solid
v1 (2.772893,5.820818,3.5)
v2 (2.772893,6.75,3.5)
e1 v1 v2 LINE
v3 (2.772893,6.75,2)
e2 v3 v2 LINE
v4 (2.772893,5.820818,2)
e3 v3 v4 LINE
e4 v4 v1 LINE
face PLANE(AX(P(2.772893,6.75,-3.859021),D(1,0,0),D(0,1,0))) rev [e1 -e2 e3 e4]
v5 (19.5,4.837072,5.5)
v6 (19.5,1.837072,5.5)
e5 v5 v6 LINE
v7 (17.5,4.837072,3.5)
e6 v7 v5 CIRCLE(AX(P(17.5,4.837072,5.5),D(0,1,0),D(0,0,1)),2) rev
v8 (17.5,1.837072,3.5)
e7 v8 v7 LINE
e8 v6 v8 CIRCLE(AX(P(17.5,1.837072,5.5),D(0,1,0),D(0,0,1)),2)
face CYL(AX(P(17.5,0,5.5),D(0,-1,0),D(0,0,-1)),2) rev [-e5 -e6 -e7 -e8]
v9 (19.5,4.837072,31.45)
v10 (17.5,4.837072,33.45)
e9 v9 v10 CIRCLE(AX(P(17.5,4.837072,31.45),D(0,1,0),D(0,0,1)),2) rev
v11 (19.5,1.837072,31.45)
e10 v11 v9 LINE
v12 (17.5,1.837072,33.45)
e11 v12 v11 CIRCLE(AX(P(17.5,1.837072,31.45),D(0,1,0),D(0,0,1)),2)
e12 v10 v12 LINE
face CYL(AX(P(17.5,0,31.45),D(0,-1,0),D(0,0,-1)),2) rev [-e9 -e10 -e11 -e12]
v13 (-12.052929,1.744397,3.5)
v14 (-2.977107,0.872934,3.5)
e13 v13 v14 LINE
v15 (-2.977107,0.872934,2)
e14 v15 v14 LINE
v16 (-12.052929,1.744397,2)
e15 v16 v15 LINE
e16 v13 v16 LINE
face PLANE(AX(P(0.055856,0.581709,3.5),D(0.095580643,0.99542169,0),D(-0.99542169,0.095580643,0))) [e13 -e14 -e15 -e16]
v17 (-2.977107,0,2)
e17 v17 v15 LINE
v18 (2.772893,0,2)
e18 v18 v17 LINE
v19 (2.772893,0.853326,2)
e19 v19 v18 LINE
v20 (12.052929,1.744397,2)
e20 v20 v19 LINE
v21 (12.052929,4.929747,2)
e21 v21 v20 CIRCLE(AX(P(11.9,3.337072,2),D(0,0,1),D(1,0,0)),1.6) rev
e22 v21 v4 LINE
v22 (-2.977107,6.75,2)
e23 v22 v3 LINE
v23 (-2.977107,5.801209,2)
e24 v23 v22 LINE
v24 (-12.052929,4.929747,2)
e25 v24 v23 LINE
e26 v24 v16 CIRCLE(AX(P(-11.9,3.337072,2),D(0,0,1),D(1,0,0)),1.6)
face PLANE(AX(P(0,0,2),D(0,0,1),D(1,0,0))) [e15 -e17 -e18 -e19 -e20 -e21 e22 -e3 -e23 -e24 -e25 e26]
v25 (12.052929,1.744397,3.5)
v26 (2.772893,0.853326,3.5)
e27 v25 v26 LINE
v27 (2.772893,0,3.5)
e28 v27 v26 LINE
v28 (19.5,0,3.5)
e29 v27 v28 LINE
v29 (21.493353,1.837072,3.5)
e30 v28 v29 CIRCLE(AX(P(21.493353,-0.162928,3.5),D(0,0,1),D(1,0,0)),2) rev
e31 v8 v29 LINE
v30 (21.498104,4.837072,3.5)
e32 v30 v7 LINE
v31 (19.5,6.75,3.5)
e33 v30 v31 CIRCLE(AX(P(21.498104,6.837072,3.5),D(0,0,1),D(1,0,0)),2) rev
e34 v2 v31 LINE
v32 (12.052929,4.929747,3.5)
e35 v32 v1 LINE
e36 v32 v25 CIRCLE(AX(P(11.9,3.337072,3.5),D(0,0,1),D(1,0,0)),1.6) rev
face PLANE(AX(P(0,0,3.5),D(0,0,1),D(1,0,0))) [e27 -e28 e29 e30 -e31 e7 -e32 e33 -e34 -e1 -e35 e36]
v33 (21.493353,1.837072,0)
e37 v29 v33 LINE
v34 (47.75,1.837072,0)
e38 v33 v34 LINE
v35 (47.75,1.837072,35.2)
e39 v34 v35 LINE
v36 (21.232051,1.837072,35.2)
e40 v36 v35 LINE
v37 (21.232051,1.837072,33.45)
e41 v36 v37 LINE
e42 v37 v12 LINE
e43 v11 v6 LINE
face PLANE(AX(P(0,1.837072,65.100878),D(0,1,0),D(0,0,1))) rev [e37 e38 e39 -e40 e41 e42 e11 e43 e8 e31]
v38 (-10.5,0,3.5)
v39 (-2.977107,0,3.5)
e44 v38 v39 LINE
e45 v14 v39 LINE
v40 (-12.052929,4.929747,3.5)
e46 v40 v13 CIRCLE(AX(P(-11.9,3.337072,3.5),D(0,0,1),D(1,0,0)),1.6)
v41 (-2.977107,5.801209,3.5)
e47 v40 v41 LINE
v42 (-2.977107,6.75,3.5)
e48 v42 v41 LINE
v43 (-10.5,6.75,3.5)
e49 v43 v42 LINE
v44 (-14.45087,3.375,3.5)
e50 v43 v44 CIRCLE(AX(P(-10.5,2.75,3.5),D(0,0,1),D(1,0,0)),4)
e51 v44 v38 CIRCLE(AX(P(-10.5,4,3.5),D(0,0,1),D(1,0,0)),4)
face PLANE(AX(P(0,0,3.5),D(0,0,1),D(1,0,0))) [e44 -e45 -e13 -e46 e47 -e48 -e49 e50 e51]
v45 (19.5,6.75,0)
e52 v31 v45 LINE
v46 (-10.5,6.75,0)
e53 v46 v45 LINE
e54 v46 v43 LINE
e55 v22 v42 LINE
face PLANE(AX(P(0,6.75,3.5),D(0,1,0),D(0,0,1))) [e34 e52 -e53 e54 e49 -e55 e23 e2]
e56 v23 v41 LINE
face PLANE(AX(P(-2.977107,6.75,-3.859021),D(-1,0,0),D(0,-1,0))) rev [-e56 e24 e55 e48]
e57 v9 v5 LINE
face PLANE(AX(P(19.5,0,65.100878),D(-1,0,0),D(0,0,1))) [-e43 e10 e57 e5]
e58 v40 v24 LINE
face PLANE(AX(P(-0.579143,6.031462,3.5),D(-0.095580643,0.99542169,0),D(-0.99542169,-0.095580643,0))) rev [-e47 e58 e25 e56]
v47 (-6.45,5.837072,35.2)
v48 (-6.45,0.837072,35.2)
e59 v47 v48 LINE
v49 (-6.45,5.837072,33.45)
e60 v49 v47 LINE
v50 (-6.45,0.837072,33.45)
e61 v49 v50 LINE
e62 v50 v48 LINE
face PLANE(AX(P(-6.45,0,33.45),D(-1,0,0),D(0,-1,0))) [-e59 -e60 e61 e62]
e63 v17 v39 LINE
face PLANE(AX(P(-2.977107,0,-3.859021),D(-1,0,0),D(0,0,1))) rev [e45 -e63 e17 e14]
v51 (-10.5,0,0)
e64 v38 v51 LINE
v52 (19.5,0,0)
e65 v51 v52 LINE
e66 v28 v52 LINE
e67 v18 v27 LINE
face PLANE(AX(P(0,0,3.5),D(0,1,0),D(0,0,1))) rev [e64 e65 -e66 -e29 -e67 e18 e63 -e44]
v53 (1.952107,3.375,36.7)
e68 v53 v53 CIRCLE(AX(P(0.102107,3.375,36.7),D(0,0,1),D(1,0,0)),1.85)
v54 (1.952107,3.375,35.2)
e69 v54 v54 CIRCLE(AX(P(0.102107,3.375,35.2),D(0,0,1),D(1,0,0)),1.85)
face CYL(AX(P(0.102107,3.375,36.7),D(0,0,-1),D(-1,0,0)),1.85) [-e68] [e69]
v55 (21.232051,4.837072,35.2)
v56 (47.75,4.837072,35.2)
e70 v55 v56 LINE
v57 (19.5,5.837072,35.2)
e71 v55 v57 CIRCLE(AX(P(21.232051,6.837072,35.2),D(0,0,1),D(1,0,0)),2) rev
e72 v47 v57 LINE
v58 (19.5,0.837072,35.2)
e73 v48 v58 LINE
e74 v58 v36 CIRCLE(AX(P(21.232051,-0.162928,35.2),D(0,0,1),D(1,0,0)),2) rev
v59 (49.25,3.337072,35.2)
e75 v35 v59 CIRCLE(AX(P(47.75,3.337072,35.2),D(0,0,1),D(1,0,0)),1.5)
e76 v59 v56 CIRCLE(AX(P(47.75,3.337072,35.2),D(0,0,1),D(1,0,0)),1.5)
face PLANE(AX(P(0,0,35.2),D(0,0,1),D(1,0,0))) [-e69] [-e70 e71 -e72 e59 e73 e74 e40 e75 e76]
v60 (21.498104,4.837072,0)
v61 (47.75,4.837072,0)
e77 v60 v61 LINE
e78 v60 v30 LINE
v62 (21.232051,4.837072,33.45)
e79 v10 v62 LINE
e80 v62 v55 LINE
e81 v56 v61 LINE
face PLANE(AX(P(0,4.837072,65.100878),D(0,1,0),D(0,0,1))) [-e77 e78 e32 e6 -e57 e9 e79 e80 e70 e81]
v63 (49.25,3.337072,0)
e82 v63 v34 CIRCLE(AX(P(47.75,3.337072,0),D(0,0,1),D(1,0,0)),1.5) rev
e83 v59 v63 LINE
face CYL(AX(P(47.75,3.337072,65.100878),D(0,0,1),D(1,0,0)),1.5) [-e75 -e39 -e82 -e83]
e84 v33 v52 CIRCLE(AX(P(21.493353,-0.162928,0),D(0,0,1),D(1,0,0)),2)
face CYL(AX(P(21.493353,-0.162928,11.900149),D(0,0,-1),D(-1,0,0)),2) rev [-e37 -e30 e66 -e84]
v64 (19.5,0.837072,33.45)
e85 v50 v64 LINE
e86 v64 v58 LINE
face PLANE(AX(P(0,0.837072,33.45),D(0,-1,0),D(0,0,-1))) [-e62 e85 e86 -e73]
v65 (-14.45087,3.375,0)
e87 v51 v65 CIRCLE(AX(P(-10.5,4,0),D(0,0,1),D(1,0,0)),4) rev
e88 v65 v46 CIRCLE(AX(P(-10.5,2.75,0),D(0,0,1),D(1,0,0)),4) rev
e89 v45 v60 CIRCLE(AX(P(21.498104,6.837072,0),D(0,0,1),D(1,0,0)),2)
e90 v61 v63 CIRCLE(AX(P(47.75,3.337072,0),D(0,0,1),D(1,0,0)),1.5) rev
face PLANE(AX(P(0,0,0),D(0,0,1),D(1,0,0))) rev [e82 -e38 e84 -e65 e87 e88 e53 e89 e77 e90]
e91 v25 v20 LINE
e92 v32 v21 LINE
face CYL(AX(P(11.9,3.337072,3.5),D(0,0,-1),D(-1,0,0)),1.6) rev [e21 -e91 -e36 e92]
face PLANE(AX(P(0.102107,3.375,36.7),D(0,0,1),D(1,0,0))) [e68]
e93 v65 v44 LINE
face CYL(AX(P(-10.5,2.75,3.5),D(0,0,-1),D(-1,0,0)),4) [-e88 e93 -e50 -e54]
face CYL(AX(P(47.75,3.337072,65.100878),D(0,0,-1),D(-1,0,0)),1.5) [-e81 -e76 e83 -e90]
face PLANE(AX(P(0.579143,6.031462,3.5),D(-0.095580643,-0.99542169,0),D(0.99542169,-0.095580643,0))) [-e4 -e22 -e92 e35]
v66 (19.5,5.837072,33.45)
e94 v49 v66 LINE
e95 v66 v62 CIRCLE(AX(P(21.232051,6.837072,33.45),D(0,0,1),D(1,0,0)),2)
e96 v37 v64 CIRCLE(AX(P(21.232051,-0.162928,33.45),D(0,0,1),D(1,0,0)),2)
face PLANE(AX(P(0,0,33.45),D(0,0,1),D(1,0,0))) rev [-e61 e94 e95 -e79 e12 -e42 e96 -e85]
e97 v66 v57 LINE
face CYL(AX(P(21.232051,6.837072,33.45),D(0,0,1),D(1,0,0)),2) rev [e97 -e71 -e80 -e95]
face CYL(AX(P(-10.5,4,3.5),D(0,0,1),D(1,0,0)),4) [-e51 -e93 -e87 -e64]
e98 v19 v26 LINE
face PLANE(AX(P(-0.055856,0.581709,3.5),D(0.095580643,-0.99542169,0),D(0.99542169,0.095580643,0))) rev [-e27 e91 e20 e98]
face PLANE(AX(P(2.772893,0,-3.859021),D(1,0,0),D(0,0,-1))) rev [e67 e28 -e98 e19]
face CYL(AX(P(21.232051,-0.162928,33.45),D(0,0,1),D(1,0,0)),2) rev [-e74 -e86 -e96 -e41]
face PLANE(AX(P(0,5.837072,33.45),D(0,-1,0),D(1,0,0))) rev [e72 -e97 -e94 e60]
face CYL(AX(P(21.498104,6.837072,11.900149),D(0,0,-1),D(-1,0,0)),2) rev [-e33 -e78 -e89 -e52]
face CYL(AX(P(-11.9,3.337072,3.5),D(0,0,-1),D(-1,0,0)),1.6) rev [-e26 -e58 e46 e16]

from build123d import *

# Parameters (mm, degrees)
SKETCH1_W            = 29
SKETCH1_H            = 6.75
BOSS_EXTRUDE10_DEPTH = 3.5
SKETCH1_16_R         = 0.291434634
BOSS_EXTRUDE15_DEPTH = 2
SKETCH1_17_W         = 29.75
SKETCH1_17_H         = 3
BOSS_EXTRUDE17_DEPTH = 35.2
SKETCH1_18_W         = 5
SKETCH1_18_H         = 1.912928139
SKETCH1_18_H_2       = 3
SKETCH1_18_H_3       = 1.837071861
BOSS_EXTRUDE20_DEPTH = 3.5
SKETCH2_W            = 25.95
SKETCH2_H            = 5
BOSS_EXTRUDE18_DEPTH = 1.75
FILLET1_R            = 2
FILLET3_R            = 2
FILLET2_R            = 4
SKETCH3_W            = 5.75
SKETCH3_H            = 1.125
CUT_EXTRUDE1_DEPTH   = 1.5
SKETCH4_R            = 1.85
BOSS_EXTRUDE19_DEPTH = 1.5
FILLET4_R            = 1.5


# Some blends are built 0.0001 mm under size
with BuildPart() as part:
    # Sketch1 → Boss-Extrude10 (new body)
    with BuildSketch(Plane.XY):
        with Locations((0, 3.375)):
            Rectangle(SKETCH1_W, SKETCH1_H)
        with BuildLine():
            Line((-12.052929028, 4.929746565), (0, 6.087071861))
            Line((0, 6.087071861), (12.052929028, 4.929746565))
            ThreePointArc((12.052929028, 4.929746565), (13.5, 3.337071861), (12.052929028, 1.744397157))
            Line((12.052929028, 1.744397157), (0, 0.587071861))
            Line((0, 0.587071861), (-12.052929028, 1.744397157))
            ThreePointArc((-12.052929028, 1.744397157), (-13.5, 3.337071861), (-12.052929028, 4.929746565))
        make_face(mode=Mode.SUBTRACT)
    extrude(amount=BOSS_EXTRUDE10_DEPTH)

    # Sketch1<16> → Boss-Extrude15 (add)
    # profile 1 of 9: a face of its own
    with BuildSketch(Plane.XY):
        with BuildLine():
            Line((-0.523286746, 6.036825735), (-12.052929028, 4.929746565))
            ThreePointArc((-12.052929028, 4.929746565), (-13.5, 3.337071861), (-12.052929028, 1.744397157))
            Line((-12.052929028, 1.744397157), (-0.523286746, 0.637317987))
            ThreePointArc((-0.523286746, 0.637317987), (-2.75, 3.337071861), (-0.523286746, 6.036825735))
        make_face()
        with Locations((-11.9, 3.337071861)):
            Circle(SKETCH1_16_R, mode=Mode.SUBTRACT)
        with Locations((-9.863185408, 3.337071861)):
            Circle(SKETCH1_16_R, mode=Mode.SUBTRACT)
        with Locations((-7.826370816, 3.337071861)):
            Circle(SKETCH1_16_R, mode=Mode.SUBTRACT)
    # profile 2 of 9: a face of its own
    with BuildSketch(Plane.XY):
        with Locations((-11.9, 3.337071861)):
            Circle(SKETCH1_16_R)
    # profile 3 of 9: a face of its own
    with BuildSketch(Plane.XY):
        with Locations((-7.826370816, 3.337071861)):
            Circle(SKETCH1_16_R)
    # profile 4 of 9: a face of its own
    with BuildSketch(Plane.XY):
        with Locations((-9.863185408, 3.337071861)):
            Circle(SKETCH1_16_R)
    # profile 5 of 9: a face of its own
    with BuildSketch(Plane.XY):
        with BuildLine():
            Line((0, 6.087071861), (-0.523286746, 6.036825735))
            ThreePointArc((-0.523286746, 6.036825735), (-2.75, 3.337071861), (-0.523286746, 0.637317987))
            Line((-0.523286746, 0.637317987), (0, 0.587071861))
            Line((0, 0.587071861), (0.523286746, 0.637317987))
            ThreePointArc((0.523286746, 0.637317987), (2.121501656, 1.587291668), (2.75, 3.337071861))
            ThreePointArc((2.75, 3.337071861), (2.121501656, 5.086852054), (0.523286746, 6.036825735))
            Line((0.523286746, 6.036825735), (0, 6.087071861))
        make_face()
    # profile 6 of 9: a face of its own
    with BuildSketch(Plane.XY):
        with BuildLine():
            Line((12.052929028, 4.929746565), (0.523286746, 6.036825735))
            ThreePointArc((0.523286746, 6.036825735), (2.121501656, 5.086852054), (2.75, 3.337071861))
            ThreePointArc((2.75, 3.337071861), (2.121501656, 1.587291668), (0.523286746, 0.637317987))
            Line((0.523286746, 0.637317987), (12.052929028, 1.744397157))
            ThreePointArc((12.052929028, 1.744397157), (13.5, 3.337071861), (12.052929028, 4.929746565))
        make_face()
        with Locations((7.826370816, 3.337071861)):
            Circle(SKETCH1_16_R, mode=Mode.SUBTRACT)
        with Locations((9.863185408, 3.337071861)):
            Circle(SKETCH1_16_R, mode=Mode.SUBTRACT)
        with Locations((11.9, 3.337071861)):
            Circle(SKETCH1_16_R, mode=Mode.SUBTRACT)
    # profile 7 of 9: a face of its own
    with BuildSketch(Plane.XY):
        with Locations((11.9, 3.337071861)):
            Circle(SKETCH1_16_R)
    # profile 8 of 9: a face of its own
    with BuildSketch(Plane.XY):
        with Locations((9.863185408, 3.337071861)):
            Circle(SKETCH1_16_R)
    # profile 9 of 9: a face of its own
    with BuildSketch(Plane.XY):
        with Locations((7.826370816, 3.337071861)):
            Circle(SKETCH1_16_R)
    extrude(amount=BOSS_EXTRUDE15_DEPTH)



with BuildPart() as body_2:
    # Sketch1<17> → Boss-Extrude17 (new body)
    with BuildSketch(Plane.XY):
        with Locations((34.375, 3.337071861)):
            Rectangle(SKETCH1_17_W, SKETCH1_17_H)
    extrude(amount=BOSS_EXTRUDE17_DEPTH)


with BuildPart() as part_1:
    add(part.part)

    add(body_2.part)  # Boss-Extrude20 merges body 2
    # Sketch1<18> → Boss-Extrude20 (add)
    with BuildSketch(Plane.XY):
        with Locations((17, 5.793535931)):
            Rectangle(SKETCH1_18_W, SKETCH1_18_H)
        with Locations((17, 3.337071861)):
            Rectangle(SKETCH1_18_W, SKETCH1_18_H_2)
        with Locations((17, 0.918535931)):
            Rectangle(SKETCH1_18_W, SKETCH1_18_H_3)
    extrude(amount=BOSS_EXTRUDE20_DEPTH)

    # Sketch2 → Boss-Extrude18 (add)
    with BuildSketch(Plane.XY.offset(35.2)):
        with Locations((6.525, 3.337071861)):
            Rectangle(SKETCH2_W, SKETCH2_H)
    extrude(amount=-BOSS_EXTRUDE18_DEPTH)

    # Fillet1
    # the kernel refuses this fillet: 2 mm, written as the material it adds along each edge
    with BuildSketch(Plane(origin=(19.5, 4.837071861, 33.45), x_dir=(1, 0, 0), z_dir=(0, 0, 1))) as fillet1_piece_1:
        with BuildLine():
            CenterArc((1.732050808, 2), FILLET1_R, 210, 60)
            Line((0, 1), (0, 0))
            Line((0, 0), (1.732050808, 0))
        make_face()
    extrude(amount=1.75)
    with BuildSketch(Plane(origin=(19.5, 4.837071861, 0), x_dir=(0, 1, 0), z_dir=(0, 0, 1))) as fillet1_piece_2:
        with BuildLine():
            CenterArc((2, -1.998103724), FILLET1_R, 92.495213733, 87.504786267)
            Line((0, -1.998103724), (0, 0))
            Line((0, 0), (1.912928139, 0))
        make_face()
    extrude(amount=3.5)
    with BuildSketch(Plane(origin=(19.5, 1.837071861, 33.45), x_dir=(1, 0, 0), z_dir=(0, 0, 1))) as fillet1_piece_3:
        with BuildLine():
            CenterArc((1.732050808, -2), FILLET1_R, 90, 60)
            Line((0, -1), (0, 0))
            Line((0, 0), (1.732050808, 0))
        make_face()
    extrude(amount=1.75)
    with BuildSketch(Plane(origin=(19.5, 1.837071861, 0), x_dir=(0, -1, 0), z_dir=(0, 0, 1))) as fillet1_piece_4:
        with BuildLine():
            CenterArc((2, 1.993352558), FILLET1_R, 180, 85.327274549)
            Line((0, 1.993352558), (0, 0))
            Line((0, 0), (1.837071861, 0))
        make_face()
    extrude(amount=3.5)

    # Fillet3
    fillet3_edges = [part_1.edges().sort_by_distance(p)[0] for p in [
        (19.5, 3.337071861, 3.5),
        (19.5, 3.337071861, 33.45),
    ]]
    fillet(fillet3_edges, radius=FILLET3_R)

    # Fillet2
    # the kernel refuses this fillet: 4 mm, written as the material it takes off along each edge
    with BuildSketch(Plane(origin=(-14.5, 6.75, -10), x_dir=(1, 0, 0), z_dir=(0, 0, 1)), Plane(origin=(-14.5, 0, -10), x_dir=(0, 1, 0), z_dir=(0, 0, 1))) as fillet2_piece_1:
        with BuildLine():
            CenterArc((FILLET2_R, -FILLET2_R), FILLET2_R, 90, 90)
            Line((0, -FILLET2_R), (0, 0))
            Line((0, 0), (FILLET2_R, 0))
        make_face()
    extrude(amount=23.5, mode=Mode.SUBTRACT)

    # Sketch3 → Cut-Extrude1 (cut)
    with BuildSketch(Plane.XY.offset(3.5)):
        with Locations((-0.102107464, 6.1875)):
            Rectangle(SKETCH3_W, SKETCH3_H)
        with Locations((-0.102107464, 0.5625)):
            Rectangle(SKETCH3_W, SKETCH3_H)
    extrude(amount=-CUT_EXTRUDE1_DEPTH, mode=Mode.SUBTRACT)

    # Sketch4 → Boss-Extrude19 (add)
    with BuildSketch(Plane.XY.offset(35.2)):
        with Locations((0.102107464, 3.375)):
            Circle(SKETCH4_R)
    extrude(amount=BOSS_EXTRUDE19_DEPTH)

    # Fillet4
    fillet4_edges = [part_1.edges().sort_by_distance(p)[0] for p in [
        (49.25, 4.837071861, 17.6),
        (49.25, 1.837071861, 17.6),
    ]]
    fillet(fillet4_edges, radius=FILLET4_R - 0.0001)  # a hair under: the kernel refuses the full size


solid = part_1.part
